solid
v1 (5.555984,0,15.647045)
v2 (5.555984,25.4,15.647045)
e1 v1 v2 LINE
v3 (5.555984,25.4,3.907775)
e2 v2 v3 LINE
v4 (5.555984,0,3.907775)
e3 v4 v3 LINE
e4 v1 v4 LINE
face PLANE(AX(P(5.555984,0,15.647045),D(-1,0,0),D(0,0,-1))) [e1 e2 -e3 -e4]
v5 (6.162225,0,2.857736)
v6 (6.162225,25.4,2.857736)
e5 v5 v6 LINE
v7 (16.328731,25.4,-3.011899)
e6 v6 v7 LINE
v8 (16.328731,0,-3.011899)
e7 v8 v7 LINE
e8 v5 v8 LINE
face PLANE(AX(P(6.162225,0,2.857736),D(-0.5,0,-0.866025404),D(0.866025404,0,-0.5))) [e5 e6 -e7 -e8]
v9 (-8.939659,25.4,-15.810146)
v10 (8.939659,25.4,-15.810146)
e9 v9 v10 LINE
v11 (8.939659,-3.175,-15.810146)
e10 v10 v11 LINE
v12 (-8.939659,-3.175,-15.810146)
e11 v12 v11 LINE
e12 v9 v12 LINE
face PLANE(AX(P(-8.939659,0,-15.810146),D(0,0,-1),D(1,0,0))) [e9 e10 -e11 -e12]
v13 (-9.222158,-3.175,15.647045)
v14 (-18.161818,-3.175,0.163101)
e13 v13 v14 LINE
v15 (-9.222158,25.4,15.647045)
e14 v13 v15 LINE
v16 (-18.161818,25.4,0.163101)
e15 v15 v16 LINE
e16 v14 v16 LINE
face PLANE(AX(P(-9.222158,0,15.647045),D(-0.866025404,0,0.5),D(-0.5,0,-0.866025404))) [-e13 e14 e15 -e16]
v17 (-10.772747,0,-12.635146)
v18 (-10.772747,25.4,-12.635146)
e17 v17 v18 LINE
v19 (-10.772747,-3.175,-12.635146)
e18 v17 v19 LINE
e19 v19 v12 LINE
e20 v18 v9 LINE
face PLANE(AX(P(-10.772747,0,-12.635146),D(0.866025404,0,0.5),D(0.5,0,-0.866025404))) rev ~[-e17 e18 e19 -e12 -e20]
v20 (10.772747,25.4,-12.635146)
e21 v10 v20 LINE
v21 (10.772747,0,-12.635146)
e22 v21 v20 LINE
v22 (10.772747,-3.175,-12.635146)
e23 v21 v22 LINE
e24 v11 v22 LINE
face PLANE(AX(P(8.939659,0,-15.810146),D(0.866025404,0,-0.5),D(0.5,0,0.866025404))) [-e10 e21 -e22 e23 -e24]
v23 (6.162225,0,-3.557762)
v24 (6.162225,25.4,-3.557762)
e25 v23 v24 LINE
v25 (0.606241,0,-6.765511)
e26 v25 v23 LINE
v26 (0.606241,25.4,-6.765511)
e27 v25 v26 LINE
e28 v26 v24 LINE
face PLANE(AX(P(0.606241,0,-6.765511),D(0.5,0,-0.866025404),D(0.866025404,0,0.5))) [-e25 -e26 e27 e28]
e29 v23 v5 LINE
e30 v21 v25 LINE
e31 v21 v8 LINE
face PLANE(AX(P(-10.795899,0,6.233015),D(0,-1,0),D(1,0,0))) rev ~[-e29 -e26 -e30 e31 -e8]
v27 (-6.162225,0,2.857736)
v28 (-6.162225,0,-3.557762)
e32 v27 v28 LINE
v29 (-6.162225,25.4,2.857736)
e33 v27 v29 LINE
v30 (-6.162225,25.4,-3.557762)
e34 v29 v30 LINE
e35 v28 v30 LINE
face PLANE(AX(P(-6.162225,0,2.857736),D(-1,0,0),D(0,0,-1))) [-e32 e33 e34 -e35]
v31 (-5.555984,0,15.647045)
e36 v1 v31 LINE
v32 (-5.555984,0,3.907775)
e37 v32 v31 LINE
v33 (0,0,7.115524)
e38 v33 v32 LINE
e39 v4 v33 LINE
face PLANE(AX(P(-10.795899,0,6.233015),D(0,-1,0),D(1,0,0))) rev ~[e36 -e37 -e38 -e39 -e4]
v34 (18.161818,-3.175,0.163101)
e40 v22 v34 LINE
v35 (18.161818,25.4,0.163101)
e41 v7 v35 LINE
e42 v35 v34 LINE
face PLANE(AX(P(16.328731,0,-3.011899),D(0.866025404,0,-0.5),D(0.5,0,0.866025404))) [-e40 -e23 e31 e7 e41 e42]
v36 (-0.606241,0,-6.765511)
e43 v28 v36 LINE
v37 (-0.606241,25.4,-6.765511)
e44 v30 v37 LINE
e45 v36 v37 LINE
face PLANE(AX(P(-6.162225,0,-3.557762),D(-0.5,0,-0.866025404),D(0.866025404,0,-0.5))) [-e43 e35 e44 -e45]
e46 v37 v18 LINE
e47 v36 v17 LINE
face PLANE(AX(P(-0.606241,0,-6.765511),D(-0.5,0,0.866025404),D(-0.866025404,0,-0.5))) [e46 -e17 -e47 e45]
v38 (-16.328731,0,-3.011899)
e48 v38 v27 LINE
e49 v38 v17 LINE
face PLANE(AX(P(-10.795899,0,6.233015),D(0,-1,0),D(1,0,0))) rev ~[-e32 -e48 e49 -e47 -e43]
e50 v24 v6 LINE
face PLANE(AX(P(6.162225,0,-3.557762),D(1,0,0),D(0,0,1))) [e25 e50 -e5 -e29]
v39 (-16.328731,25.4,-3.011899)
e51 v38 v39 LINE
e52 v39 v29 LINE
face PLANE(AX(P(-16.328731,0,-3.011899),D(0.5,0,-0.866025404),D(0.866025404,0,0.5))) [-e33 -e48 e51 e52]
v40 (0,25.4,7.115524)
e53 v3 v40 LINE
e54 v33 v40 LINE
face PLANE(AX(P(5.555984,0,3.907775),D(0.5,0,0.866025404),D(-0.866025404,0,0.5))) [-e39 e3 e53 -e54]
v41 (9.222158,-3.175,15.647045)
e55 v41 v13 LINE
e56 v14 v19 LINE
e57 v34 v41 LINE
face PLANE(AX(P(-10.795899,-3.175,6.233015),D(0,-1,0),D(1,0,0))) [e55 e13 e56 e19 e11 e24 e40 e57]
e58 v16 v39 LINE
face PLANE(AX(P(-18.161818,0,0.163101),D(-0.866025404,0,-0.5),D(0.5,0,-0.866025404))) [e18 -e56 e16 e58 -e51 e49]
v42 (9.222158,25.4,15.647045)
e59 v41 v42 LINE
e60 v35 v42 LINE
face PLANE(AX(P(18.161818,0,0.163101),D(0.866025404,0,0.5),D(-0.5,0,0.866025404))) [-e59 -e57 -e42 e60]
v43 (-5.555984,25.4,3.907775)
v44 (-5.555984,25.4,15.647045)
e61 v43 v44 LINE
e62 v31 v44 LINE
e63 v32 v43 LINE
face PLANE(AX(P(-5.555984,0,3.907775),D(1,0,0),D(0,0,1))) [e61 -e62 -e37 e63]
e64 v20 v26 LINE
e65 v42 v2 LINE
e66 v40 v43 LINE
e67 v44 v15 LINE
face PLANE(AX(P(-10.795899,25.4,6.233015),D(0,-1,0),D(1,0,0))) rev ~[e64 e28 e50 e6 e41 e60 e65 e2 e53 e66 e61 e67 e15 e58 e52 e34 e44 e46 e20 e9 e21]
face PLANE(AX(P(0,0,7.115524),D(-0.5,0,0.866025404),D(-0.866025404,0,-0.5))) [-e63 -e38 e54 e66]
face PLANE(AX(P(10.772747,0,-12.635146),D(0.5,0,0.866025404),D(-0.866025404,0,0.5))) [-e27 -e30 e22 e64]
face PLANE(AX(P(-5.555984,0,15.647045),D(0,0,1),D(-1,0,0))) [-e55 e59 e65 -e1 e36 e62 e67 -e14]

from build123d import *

# Parameters (mm, degrees)
F2_DEPTH = 3.175
F3_DEPTH = 25.4


# Not quite as in the source:
# - a feature names something its author has since deleted; it is built from what else it names


with BuildPart() as f2:
    # F1 (on Front) → F2 (new body)
    with BuildSketch(Plane.XZ):
        Polygon((-18.1618179038, 0.1631008549), (-16.3287307991, -3.0118991451), (-6.1622247723, 2.8577358462), (-6.1622247723, 3.5577621311), (-5.5559842263, 3.9077752735), (-5.5559842263, 15.6470452561), (-9.2221584356, 15.6470452561), align=None)
        Polygon((6.1622247723, 2.8577358462), (16.3287307991, -3.0118991451), (18.1618179038, 0.1631008549), (9.2221584356, 15.6470452561), (5.5559842263, 15.6470452561), (5.5559842263, 3.9077752735), (6.1622247723, 3.5577621311), align=None)
        Polygon((-0.606240546, -6.7655111197), (-10.7727465728, -12.635146111), (-8.9396594682, -15.810146111), (8.9396594682, -15.810146111), (10.7727465728, -12.635146111), (0.606240546, -6.7655111197), (0, -7.1155242622), align=None)
        Polygon((5.5559842263, 3.2077489886), (6.1622247723, 2.8577358462), (6.1622247723, 3.5577621311), (5.5559842263, 3.9077752735), align=None)
        Polygon((-6.1622247723, 3.5577621311), (-6.1622247723, 2.8577358462), (-5.5559842263, 3.2077489886), (-5.5559842263, 3.9077752735), align=None)
        Polygon((0, -6.4154979773), (-0.606240546, -6.7655111197), (0, -7.1155242622), (0.606240546, -6.7655111197), align=None)
        Polygon((-6.1622247723, -3.5577621311), (-0.606240546, -6.7655111197), (0, -6.4154979773), (0.606240546, -6.7655111197), (6.1622247723, -3.5577621311), (6.1622247723, 2.8577358462), (5.5559842263, 3.2077489886), (5.5559842263, 3.9077752735), (0, 7.1155242622), (-5.5559842263, 3.9077752735), (-5.5559842263, 3.2077489886), (-6.1622247723, 2.8577358462), align=None)
        Polygon((5.5559842263, 15.6470452561), (-5.5559842263, 15.6470452561), (-5.5559842263, 3.9077752735), (0, 7.1155242622), (5.5559842263, 3.9077752735), align=None)
        Polygon((-16.3287307991, -3.0118991451), (-10.7727465728, -12.635146111), (-0.606240546, -6.7655111197), (-6.1622247723, -3.5577621311), (-6.1622247723, 2.8577358462), align=None)
        Polygon((0.606240546, -6.7655111197), (10.7727465728, -12.635146111), (16.3287307991, -3.0118991451), (6.1622247723, 2.8577358462), (6.1622247723, -3.5577621311), align=None)
    extrude(amount=F2_DEPTH)

    # F1 (on Front) → F3 (join)
    with BuildSketch(Plane.XZ):
        Polygon((-18.1618179038, 0.1631008549), (-16.3287307991, -3.0118991451), (-6.1622247723, 2.8577358462), (-6.1622247723, 3.5577621311), (-5.5559842263, 3.9077752735), (-5.5559842263, 15.6470452561), (-9.2221584356, 15.6470452561), align=None)
        Polygon((-0.606240546, -6.7655111197), (-10.7727465728, -12.635146111), (-8.9396594682, -15.810146111), (8.9396594682, -15.810146111), (10.7727465728, -12.635146111), (0.606240546, -6.7655111197), (0, -7.1155242622), align=None)
        Polygon((6.1622247723, 2.8577358462), (16.3287307991, -3.0118991451), (18.1618179038, 0.1631008549), (9.2221584356, 15.6470452561), (5.5559842263, 15.6470452561), (5.5559842263, 3.9077752735), (6.1622247723, 3.5577621311), align=None)
        Polygon((-6.1622247723, -3.5577621311), (-0.606240546, -6.7655111197), (0, -6.4154979773), (0.606240546, -6.7655111197), (6.1622247723, -3.5577621311), (6.1622247723, 2.8577358462), (5.5559842263, 3.2077489886), (5.5559842263, 3.9077752735), (0, 7.1155242622), (-5.5559842263, 3.9077752735), (-5.5559842263, 3.2077489886), (-6.1622247723, 2.8577358462), align=None)
        Polygon((5.5559842263, 3.2077489886), (6.1622247723, 2.8577358462), (6.1622247723, 3.5577621311), (5.5559842263, 3.9077752735), align=None)
        Polygon((0, -6.4154979773), (-0.606240546, -6.7655111197), (0, -7.1155242622), (0.606240546, -6.7655111197), align=None)
        Polygon((-6.1622247723, 3.5577621311), (-6.1622247723, 2.8577358462), (-5.5559842263, 3.2077489886), (-5.5559842263, 3.9077752735), align=None)
    extrude(amount=-F3_DEPTH)


solid = f2.part
